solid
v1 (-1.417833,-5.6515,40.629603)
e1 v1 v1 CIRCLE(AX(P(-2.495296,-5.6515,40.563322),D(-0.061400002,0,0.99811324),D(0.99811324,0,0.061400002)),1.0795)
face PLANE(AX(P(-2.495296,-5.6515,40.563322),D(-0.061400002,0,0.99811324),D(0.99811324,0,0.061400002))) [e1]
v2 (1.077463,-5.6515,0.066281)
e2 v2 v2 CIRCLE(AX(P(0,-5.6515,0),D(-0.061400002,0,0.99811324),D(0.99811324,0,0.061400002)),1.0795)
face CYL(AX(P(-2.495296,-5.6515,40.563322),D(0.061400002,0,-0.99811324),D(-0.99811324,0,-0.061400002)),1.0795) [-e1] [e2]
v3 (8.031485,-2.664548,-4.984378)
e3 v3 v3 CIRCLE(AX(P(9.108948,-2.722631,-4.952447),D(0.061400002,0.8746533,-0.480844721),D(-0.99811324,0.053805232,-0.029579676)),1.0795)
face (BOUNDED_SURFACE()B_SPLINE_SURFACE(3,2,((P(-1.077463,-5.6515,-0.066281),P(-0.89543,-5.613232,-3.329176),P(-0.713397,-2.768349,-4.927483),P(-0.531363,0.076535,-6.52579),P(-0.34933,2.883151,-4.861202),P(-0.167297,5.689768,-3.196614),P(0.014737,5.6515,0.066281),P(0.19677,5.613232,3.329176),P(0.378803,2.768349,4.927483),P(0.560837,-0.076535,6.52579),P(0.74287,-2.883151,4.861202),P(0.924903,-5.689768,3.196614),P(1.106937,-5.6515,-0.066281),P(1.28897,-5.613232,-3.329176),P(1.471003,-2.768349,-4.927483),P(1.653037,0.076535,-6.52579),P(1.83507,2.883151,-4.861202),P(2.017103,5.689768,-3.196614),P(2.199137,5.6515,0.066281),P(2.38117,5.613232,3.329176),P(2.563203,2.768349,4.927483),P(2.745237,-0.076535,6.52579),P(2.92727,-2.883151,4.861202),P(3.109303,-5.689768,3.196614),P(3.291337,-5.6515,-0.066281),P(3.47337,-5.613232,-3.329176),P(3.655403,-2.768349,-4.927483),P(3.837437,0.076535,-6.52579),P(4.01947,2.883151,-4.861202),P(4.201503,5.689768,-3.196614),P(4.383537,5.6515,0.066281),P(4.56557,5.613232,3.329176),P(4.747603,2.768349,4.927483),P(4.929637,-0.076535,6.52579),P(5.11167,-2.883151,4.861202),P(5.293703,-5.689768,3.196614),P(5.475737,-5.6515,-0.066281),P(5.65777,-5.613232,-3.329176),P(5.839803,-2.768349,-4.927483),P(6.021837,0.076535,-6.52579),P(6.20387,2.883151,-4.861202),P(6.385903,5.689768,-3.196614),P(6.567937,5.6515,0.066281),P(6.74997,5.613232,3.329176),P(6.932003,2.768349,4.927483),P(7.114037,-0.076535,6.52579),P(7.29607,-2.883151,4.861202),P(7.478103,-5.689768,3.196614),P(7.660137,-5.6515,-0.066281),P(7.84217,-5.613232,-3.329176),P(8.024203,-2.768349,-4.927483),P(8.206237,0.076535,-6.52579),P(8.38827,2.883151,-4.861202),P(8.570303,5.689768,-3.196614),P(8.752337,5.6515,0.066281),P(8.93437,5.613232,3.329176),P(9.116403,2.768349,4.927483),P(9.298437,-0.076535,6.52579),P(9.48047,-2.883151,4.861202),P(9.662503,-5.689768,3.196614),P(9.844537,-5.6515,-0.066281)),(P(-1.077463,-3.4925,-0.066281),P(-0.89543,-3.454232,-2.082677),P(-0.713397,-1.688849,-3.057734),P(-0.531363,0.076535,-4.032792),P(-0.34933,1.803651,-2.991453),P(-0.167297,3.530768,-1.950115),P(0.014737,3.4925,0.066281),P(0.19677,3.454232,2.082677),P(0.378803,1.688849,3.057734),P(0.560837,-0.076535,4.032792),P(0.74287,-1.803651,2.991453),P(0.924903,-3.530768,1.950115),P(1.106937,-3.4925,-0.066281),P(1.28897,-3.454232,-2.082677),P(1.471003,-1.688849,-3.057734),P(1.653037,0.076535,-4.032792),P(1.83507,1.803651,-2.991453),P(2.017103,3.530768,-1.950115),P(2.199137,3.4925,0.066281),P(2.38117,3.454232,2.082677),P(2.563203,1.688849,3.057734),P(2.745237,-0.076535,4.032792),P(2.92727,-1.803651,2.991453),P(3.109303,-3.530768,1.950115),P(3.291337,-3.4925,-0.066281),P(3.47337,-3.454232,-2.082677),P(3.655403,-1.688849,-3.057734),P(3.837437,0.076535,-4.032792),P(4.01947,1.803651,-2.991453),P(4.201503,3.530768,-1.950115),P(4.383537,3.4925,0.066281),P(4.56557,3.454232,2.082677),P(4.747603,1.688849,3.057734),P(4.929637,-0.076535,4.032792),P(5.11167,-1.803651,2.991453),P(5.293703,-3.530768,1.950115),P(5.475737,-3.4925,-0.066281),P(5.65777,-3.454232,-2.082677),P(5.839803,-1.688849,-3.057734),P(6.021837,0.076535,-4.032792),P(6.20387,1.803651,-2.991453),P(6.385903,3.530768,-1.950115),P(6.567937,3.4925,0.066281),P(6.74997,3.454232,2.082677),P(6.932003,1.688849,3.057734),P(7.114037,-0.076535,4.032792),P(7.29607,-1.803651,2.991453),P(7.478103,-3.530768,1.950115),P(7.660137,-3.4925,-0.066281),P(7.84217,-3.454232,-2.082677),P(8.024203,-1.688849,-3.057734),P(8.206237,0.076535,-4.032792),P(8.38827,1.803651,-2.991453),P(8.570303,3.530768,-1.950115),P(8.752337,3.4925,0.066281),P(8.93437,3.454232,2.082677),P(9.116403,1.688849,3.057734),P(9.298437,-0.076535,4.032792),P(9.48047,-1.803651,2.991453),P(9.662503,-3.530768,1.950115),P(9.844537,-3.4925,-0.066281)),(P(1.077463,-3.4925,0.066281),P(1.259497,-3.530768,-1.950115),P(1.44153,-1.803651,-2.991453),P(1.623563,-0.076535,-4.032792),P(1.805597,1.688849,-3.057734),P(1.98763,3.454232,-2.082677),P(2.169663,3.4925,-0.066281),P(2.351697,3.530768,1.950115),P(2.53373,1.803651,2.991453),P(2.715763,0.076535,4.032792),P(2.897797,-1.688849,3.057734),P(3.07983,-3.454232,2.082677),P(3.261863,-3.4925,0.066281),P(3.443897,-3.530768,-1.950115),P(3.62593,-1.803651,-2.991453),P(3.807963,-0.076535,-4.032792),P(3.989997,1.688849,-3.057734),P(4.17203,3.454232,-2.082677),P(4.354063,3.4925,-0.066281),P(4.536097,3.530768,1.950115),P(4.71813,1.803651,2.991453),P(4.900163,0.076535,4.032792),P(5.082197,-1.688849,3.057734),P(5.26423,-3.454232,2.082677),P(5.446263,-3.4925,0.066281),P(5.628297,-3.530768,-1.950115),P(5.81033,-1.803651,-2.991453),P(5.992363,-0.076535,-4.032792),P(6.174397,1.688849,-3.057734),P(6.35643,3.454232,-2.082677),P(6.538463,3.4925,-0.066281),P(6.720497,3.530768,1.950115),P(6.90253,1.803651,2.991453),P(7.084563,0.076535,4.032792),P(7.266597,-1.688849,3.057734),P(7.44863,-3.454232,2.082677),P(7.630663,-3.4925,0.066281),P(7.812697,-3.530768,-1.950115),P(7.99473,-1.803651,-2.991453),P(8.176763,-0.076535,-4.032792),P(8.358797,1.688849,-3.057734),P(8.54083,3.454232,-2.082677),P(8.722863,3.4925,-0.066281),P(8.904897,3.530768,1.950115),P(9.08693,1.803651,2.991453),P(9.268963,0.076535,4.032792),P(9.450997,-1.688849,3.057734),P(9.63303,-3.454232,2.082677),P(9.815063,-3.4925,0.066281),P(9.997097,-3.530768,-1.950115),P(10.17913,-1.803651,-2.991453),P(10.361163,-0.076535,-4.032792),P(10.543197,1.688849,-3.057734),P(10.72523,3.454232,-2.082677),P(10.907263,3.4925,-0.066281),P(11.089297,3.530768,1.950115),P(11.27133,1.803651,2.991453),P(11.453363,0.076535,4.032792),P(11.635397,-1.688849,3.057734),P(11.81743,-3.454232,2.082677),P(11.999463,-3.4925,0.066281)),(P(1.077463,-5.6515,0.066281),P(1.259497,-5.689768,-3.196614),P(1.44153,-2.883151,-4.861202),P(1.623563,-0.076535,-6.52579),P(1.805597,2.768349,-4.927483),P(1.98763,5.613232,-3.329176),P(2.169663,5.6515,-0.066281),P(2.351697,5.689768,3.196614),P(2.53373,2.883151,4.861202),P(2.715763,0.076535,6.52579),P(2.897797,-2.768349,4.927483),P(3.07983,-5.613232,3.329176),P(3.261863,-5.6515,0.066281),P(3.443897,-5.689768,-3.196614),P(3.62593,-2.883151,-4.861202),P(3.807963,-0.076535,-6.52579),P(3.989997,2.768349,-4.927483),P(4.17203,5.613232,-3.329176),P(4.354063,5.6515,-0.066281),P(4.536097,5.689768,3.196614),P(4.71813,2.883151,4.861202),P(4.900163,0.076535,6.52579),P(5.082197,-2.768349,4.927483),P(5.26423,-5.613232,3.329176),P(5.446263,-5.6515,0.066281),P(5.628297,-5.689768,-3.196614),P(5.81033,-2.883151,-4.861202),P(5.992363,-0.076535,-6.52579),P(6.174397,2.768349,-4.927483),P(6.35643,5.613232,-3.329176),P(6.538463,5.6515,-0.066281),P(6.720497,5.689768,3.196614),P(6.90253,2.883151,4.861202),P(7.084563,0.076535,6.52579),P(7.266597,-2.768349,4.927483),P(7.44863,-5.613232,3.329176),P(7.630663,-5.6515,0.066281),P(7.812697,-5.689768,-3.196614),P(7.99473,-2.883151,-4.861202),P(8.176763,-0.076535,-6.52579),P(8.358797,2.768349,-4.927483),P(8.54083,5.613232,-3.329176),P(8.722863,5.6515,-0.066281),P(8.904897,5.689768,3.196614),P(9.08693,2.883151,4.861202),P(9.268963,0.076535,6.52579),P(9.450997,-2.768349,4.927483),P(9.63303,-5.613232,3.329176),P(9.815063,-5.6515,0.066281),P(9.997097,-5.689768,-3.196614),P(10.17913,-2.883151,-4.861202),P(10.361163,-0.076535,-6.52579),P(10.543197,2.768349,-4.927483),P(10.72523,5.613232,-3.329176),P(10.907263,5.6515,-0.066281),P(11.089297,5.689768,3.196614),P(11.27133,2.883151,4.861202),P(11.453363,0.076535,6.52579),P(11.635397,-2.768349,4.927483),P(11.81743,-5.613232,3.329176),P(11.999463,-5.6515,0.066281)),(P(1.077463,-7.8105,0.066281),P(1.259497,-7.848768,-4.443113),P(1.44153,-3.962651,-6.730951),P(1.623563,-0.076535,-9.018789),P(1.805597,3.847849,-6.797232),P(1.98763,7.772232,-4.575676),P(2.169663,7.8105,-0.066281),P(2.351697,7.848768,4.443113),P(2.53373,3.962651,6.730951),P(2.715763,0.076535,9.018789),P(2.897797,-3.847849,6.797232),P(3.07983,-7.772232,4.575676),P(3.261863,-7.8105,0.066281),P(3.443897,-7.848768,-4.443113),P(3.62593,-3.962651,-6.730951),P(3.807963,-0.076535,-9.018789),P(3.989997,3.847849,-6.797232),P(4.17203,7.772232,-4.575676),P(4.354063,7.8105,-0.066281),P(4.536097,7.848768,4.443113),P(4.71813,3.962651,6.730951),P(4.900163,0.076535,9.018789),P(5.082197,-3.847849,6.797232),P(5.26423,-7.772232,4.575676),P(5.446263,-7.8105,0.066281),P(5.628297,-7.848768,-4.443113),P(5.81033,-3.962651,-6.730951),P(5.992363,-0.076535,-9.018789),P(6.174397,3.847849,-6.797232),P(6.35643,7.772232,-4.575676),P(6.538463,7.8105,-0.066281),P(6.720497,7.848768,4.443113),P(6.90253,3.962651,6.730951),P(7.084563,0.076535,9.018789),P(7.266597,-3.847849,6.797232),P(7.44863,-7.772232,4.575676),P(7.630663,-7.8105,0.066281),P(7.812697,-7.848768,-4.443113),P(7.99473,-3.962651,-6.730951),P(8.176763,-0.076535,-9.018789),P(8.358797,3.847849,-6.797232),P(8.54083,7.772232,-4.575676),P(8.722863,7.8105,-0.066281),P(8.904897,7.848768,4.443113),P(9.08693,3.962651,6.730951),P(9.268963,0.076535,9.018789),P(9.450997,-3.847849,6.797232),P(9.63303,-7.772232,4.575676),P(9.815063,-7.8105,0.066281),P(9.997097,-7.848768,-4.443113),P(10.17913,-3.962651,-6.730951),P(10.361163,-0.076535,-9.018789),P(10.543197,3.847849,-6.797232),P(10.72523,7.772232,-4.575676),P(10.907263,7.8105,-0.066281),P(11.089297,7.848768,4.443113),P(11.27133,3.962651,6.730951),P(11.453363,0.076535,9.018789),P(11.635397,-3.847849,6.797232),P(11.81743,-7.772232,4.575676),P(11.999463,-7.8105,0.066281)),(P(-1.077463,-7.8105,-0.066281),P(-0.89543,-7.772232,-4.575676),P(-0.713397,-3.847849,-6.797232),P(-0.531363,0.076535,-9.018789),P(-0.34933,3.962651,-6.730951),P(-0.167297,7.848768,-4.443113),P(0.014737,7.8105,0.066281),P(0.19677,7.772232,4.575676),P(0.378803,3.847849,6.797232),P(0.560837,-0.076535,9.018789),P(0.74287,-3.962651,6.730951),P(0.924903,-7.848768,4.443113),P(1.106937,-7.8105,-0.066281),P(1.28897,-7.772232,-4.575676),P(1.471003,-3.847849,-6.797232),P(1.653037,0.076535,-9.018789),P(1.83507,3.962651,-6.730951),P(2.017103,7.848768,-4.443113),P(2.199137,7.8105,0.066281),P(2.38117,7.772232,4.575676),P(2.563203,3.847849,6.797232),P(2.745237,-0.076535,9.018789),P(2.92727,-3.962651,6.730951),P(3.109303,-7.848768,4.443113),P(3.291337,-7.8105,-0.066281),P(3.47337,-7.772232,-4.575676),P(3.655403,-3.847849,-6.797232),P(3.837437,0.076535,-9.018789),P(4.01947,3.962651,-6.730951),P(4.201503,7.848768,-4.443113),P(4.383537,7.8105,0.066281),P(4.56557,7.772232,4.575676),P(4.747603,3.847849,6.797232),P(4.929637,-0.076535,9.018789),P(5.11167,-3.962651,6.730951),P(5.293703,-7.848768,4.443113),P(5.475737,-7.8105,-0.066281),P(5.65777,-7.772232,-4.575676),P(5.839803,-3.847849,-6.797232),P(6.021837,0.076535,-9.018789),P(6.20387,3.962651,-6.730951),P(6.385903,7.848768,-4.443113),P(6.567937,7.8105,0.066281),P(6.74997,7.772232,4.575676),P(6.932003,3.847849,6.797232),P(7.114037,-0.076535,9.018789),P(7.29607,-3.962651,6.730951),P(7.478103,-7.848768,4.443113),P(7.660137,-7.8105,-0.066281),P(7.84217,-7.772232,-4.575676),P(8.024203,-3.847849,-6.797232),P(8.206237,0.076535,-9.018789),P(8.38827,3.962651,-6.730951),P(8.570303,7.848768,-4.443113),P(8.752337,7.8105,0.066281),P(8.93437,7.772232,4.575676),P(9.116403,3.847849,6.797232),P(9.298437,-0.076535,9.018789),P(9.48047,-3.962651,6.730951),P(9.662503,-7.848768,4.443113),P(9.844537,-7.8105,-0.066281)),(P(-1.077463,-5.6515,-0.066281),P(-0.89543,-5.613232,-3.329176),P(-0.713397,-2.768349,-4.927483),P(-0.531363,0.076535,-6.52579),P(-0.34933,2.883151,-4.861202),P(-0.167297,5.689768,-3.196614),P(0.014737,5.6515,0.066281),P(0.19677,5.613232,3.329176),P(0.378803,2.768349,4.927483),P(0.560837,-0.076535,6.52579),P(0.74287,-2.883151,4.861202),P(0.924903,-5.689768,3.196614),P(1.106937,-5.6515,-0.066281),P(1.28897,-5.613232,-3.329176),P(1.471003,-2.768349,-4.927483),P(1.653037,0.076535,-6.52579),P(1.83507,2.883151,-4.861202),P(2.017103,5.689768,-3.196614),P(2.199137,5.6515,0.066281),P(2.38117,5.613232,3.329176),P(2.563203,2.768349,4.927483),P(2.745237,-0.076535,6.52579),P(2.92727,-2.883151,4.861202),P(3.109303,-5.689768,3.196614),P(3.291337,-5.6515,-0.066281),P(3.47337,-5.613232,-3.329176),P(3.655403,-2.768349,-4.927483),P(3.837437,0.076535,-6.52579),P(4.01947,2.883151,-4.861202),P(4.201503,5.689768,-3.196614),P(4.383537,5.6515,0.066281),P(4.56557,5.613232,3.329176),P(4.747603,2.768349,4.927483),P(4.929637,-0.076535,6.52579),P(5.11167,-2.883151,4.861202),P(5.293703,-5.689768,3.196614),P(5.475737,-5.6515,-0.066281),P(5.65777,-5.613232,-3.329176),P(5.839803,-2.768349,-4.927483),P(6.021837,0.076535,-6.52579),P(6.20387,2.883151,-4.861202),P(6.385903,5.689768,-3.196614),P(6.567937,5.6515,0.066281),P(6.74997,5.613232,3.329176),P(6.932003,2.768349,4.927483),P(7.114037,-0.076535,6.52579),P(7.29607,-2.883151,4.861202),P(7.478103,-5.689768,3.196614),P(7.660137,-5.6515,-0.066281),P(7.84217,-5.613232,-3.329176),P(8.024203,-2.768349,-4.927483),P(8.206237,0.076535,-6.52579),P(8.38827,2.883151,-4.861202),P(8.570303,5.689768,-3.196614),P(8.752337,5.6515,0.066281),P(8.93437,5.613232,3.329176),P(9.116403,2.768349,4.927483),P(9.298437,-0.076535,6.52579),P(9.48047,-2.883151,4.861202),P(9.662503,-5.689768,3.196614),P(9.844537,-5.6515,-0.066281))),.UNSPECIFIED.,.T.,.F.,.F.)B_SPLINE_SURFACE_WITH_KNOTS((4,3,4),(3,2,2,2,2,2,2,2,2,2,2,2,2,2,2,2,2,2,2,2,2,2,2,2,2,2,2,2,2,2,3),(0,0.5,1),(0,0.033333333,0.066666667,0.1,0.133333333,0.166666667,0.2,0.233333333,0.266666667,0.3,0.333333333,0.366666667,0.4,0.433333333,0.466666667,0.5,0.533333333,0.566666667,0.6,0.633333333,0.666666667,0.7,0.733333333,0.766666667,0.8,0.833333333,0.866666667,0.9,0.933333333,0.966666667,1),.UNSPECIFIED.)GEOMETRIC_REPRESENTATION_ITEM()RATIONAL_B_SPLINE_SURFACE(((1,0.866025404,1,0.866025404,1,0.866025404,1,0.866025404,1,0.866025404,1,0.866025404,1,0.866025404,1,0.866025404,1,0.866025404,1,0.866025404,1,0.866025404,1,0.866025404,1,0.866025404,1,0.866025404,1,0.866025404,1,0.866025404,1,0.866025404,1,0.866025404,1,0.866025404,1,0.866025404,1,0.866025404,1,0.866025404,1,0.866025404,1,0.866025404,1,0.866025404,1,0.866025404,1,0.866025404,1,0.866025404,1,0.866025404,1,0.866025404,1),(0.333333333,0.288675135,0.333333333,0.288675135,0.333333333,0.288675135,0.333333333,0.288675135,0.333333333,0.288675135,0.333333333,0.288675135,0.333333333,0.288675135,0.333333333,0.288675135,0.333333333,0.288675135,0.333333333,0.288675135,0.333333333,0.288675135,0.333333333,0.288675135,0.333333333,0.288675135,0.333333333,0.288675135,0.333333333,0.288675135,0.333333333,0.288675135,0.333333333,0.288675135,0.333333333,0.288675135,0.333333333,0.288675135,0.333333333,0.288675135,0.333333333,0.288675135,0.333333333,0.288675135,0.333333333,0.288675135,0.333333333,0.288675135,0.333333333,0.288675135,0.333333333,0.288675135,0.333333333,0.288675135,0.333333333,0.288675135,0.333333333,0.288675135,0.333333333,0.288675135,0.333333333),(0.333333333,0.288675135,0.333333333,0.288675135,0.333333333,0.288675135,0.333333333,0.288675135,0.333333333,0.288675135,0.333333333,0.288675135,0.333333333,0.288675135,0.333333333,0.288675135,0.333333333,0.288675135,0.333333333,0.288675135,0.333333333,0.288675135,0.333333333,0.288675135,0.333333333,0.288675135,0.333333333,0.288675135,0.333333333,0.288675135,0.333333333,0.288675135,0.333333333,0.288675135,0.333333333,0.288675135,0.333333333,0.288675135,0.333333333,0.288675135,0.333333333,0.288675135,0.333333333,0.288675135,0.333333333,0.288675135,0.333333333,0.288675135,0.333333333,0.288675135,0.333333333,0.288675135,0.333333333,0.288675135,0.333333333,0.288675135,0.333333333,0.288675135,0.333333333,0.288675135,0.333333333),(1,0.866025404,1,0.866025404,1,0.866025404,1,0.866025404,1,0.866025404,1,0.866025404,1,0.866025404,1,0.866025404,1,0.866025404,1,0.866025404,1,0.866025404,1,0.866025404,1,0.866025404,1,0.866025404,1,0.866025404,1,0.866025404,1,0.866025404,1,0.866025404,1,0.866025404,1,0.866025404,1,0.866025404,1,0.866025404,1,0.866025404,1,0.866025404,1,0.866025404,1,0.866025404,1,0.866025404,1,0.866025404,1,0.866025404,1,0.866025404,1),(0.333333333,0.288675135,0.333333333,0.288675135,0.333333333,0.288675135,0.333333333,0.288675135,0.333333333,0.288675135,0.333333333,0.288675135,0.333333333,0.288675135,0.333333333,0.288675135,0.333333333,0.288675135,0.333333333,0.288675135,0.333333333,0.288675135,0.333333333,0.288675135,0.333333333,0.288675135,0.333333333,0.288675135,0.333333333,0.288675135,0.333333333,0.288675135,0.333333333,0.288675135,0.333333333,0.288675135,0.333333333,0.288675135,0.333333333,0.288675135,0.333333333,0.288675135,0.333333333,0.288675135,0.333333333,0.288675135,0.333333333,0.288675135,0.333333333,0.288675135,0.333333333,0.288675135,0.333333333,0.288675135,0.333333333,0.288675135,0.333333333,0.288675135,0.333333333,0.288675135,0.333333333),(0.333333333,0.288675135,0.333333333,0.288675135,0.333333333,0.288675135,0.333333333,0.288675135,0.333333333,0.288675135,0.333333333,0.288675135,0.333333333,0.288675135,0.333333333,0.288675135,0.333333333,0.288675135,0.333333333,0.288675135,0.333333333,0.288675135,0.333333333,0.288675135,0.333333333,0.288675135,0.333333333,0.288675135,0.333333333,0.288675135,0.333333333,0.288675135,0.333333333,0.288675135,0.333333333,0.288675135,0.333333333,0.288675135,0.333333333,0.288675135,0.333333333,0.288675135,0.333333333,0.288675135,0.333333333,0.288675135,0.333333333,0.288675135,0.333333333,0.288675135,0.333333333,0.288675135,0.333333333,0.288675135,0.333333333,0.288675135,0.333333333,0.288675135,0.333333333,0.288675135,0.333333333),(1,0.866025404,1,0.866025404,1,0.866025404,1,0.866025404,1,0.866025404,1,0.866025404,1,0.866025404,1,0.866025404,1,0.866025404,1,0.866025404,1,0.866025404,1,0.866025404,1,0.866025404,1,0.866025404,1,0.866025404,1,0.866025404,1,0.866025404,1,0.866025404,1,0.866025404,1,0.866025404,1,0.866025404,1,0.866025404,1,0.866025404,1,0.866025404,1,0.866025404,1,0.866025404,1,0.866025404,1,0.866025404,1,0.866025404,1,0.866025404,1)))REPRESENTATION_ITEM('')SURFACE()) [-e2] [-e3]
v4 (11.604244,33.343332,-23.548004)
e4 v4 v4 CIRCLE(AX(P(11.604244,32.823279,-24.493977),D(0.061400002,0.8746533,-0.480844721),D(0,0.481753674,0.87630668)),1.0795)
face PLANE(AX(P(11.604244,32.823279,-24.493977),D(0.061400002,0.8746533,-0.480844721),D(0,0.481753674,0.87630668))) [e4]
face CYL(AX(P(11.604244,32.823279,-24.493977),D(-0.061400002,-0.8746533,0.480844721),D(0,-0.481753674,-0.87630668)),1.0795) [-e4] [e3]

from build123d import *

# Parameters (mm, degrees)
SWEEP1_PITCH   = 2.1844
SKETCH3_R      = 1.0795
EXTRUDE1_DEPTH = 40.64
SKETCH4_R      = 1.0795
EXTRUDE2_DEPTH = 40.64


with BuildPart() as part:
    # Sweep1: the profile of Sketch2 screwed along a right-hand helix of 4.17 turns, 6 arcs to a turn; built about Z, then put on its axis
    sweep1_z = Axis((0, 0, 0), (0, 0, 1))
    sweep1_corners = [(5.55553317, -0.066018869, 1.073197152), (6.726725845, -0.005892364, 0.095785764), (5.74746683, 0.066018869, -1.073197152), (4.576274155, 0.005892364, -0.095785764)]
    with BuildLine(mode=Mode.PRIVATE) as sweep1_profile:
        ThreePointArc((5.55553317, -0.066018869, 1.073197152), (6.34394069, -0.05084892, 0.826595747), (6.726725845, -0.005892364, 0.095785764))
        ThreePointArc((6.726725845, -0.005892364, 0.095785764), (6.479658283, 0.04251586, -0.69113422), (5.74746683, 0.066018869, -1.073197152))
        ThreePointArc((5.74746683, 0.066018869, -1.073197152), (4.95905931, 0.05084892, -0.826595747), (4.576274155, 0.005892364, -0.095785764))
        ThreePointArc((4.576274155, 0.005892364, -0.095785764), (4.823341717, -0.04251586, 0.69113422), (5.55553317, -0.066018869, 1.073197152))
    sweep1_cap = Face(sweep1_profile.wire())
    sweep1_arcs = [((5.55553317, -0.066018869, 1.073197152), (6.630759014, -0.071911232, 1.168982916), (6.726725845, -0.005892364, 0.095785764), (1, 0.7071067811865476, 1)), ((6.726725845, -0.005892364, 0.095785764), (6.822692675, 0.060126505, -0.977411388), (5.74746683, 0.066018869, -1.073197152), (1, 0.7071067811865476, 1)), ((5.74746683, 0.066018869, -1.073197152), (4.672240986, 0.071911232, -1.168982916), (4.576274155, 0.005892364, -0.095785764), (1, 0.7071067811865476, 1)), ((4.576274155, 0.005892364, -0.095785764), (4.480307325, -0.060126505, 0.977411388), (5.55553317, -0.066018869, 1.073197152), (1, 0.7071067811865476, 1))]  # start, shoulder, end, weights
    sweep1_turn_angles = [0, 30, 60, 90, 120, 150, 180, 210, 240, 270, 300, 330, 360]
    sweep1_turn_weights = [1, 0.8660254037844387, 1, 0.8660254037844387, 1, 0.8660254037844387, 1, 0.8660254037844387, 1, 0.8660254037844387, 1, 0.8660254037844387, 1]
    sweep1_turn_sides = [Face.make_bezier_surface([[Vector(p[j][0], p[j][1], 0).rotate(sweep1_z, sweep1_turn_angles[2 * i + k]) / sweep1_turn_weights[2 * i + k] + Vector(0, 0, p[j][2] + SWEEP1_PITCH * sweep1_turn_angles[2 * i + k] / 360) for k in range(3)] for j in range(3)], [[p[3][j] * sweep1_turn_weights[2 * i + k] for k in range(3)] for j in range(3)]) for p in sweep1_arcs for i in range(6)]
    sweep1_last_angles = [1440, 1470, 1500, 1500.6, 1501.2]
    sweep1_last_weights = [1, 0.8660254037844387, 1, 0.9999451693655119, 1]
    sweep1_last_sides = [Face.make_bezier_surface([[Vector(p[j][0], p[j][1], 0).rotate(sweep1_z, sweep1_last_angles[2 * i + k]) / sweep1_last_weights[2 * i + k] + Vector(0, 0, p[j][2] + SWEEP1_PITCH * sweep1_last_angles[2 * i + k] / 360) for k in range(3)] for j in range(3)], [[p[3][j] * sweep1_last_weights[2 * i + k] for k in range(3)] for j in range(3)]) for p in sweep1_arcs for i in range(2)]
    sweep1 = Plane(origin=(0, 0, 0), x_dir=(0, -1, 0), z_dir=(1, 0, 0)) * Solid(Shell([*[p.moved(Location((0, 0, SWEEP1_PITCH * i))) for i in range(4) for p in sweep1_turn_sides], *sweep1_last_sides, sweep1_cap, sweep1_cap.rotate(sweep1_z, 1501.2).moved(Location((0, 0, SWEEP1_PITCH * 1501.2 / 360)))]))
    add(sweep1)

    # Sketch3 → Extrude1 (add)
    with BuildSketch(Plane(origin=(0, 0, 0), x_dir=(-0.9941613262645035, -0.08889933338030652, -0.06115689564178949), z_dir=(-0.06140000183272062, -1.1654739673350178e-14, 0.9981132399557388))):
        with Locations(Location((0.502414583, 5.629123541, 0), (0, 0, 174.899710282))):
            Circle(SKETCH3_R)
    extrude(amount=EXTRUDE1_DEPTH)

    # Sketch4 → Extrude2 (add)
    with BuildSketch(Plane(origin=(0.034340372, 0.48918434, -0.268931367), x_dir=(0.9917527835165177, -0.10776254017565946, -0.06938048228521158), z_dir=(0.0614000018327206, 0.8746532996134688, -0.4808447205181871))):
        with Locations(Location((9.67082533, 4.590720934, 0), (0, 0, 173.528234673))):
            Circle(SKETCH4_R)
    extrude(amount=EXTRUDE2_DEPTH)


solid = part.part
